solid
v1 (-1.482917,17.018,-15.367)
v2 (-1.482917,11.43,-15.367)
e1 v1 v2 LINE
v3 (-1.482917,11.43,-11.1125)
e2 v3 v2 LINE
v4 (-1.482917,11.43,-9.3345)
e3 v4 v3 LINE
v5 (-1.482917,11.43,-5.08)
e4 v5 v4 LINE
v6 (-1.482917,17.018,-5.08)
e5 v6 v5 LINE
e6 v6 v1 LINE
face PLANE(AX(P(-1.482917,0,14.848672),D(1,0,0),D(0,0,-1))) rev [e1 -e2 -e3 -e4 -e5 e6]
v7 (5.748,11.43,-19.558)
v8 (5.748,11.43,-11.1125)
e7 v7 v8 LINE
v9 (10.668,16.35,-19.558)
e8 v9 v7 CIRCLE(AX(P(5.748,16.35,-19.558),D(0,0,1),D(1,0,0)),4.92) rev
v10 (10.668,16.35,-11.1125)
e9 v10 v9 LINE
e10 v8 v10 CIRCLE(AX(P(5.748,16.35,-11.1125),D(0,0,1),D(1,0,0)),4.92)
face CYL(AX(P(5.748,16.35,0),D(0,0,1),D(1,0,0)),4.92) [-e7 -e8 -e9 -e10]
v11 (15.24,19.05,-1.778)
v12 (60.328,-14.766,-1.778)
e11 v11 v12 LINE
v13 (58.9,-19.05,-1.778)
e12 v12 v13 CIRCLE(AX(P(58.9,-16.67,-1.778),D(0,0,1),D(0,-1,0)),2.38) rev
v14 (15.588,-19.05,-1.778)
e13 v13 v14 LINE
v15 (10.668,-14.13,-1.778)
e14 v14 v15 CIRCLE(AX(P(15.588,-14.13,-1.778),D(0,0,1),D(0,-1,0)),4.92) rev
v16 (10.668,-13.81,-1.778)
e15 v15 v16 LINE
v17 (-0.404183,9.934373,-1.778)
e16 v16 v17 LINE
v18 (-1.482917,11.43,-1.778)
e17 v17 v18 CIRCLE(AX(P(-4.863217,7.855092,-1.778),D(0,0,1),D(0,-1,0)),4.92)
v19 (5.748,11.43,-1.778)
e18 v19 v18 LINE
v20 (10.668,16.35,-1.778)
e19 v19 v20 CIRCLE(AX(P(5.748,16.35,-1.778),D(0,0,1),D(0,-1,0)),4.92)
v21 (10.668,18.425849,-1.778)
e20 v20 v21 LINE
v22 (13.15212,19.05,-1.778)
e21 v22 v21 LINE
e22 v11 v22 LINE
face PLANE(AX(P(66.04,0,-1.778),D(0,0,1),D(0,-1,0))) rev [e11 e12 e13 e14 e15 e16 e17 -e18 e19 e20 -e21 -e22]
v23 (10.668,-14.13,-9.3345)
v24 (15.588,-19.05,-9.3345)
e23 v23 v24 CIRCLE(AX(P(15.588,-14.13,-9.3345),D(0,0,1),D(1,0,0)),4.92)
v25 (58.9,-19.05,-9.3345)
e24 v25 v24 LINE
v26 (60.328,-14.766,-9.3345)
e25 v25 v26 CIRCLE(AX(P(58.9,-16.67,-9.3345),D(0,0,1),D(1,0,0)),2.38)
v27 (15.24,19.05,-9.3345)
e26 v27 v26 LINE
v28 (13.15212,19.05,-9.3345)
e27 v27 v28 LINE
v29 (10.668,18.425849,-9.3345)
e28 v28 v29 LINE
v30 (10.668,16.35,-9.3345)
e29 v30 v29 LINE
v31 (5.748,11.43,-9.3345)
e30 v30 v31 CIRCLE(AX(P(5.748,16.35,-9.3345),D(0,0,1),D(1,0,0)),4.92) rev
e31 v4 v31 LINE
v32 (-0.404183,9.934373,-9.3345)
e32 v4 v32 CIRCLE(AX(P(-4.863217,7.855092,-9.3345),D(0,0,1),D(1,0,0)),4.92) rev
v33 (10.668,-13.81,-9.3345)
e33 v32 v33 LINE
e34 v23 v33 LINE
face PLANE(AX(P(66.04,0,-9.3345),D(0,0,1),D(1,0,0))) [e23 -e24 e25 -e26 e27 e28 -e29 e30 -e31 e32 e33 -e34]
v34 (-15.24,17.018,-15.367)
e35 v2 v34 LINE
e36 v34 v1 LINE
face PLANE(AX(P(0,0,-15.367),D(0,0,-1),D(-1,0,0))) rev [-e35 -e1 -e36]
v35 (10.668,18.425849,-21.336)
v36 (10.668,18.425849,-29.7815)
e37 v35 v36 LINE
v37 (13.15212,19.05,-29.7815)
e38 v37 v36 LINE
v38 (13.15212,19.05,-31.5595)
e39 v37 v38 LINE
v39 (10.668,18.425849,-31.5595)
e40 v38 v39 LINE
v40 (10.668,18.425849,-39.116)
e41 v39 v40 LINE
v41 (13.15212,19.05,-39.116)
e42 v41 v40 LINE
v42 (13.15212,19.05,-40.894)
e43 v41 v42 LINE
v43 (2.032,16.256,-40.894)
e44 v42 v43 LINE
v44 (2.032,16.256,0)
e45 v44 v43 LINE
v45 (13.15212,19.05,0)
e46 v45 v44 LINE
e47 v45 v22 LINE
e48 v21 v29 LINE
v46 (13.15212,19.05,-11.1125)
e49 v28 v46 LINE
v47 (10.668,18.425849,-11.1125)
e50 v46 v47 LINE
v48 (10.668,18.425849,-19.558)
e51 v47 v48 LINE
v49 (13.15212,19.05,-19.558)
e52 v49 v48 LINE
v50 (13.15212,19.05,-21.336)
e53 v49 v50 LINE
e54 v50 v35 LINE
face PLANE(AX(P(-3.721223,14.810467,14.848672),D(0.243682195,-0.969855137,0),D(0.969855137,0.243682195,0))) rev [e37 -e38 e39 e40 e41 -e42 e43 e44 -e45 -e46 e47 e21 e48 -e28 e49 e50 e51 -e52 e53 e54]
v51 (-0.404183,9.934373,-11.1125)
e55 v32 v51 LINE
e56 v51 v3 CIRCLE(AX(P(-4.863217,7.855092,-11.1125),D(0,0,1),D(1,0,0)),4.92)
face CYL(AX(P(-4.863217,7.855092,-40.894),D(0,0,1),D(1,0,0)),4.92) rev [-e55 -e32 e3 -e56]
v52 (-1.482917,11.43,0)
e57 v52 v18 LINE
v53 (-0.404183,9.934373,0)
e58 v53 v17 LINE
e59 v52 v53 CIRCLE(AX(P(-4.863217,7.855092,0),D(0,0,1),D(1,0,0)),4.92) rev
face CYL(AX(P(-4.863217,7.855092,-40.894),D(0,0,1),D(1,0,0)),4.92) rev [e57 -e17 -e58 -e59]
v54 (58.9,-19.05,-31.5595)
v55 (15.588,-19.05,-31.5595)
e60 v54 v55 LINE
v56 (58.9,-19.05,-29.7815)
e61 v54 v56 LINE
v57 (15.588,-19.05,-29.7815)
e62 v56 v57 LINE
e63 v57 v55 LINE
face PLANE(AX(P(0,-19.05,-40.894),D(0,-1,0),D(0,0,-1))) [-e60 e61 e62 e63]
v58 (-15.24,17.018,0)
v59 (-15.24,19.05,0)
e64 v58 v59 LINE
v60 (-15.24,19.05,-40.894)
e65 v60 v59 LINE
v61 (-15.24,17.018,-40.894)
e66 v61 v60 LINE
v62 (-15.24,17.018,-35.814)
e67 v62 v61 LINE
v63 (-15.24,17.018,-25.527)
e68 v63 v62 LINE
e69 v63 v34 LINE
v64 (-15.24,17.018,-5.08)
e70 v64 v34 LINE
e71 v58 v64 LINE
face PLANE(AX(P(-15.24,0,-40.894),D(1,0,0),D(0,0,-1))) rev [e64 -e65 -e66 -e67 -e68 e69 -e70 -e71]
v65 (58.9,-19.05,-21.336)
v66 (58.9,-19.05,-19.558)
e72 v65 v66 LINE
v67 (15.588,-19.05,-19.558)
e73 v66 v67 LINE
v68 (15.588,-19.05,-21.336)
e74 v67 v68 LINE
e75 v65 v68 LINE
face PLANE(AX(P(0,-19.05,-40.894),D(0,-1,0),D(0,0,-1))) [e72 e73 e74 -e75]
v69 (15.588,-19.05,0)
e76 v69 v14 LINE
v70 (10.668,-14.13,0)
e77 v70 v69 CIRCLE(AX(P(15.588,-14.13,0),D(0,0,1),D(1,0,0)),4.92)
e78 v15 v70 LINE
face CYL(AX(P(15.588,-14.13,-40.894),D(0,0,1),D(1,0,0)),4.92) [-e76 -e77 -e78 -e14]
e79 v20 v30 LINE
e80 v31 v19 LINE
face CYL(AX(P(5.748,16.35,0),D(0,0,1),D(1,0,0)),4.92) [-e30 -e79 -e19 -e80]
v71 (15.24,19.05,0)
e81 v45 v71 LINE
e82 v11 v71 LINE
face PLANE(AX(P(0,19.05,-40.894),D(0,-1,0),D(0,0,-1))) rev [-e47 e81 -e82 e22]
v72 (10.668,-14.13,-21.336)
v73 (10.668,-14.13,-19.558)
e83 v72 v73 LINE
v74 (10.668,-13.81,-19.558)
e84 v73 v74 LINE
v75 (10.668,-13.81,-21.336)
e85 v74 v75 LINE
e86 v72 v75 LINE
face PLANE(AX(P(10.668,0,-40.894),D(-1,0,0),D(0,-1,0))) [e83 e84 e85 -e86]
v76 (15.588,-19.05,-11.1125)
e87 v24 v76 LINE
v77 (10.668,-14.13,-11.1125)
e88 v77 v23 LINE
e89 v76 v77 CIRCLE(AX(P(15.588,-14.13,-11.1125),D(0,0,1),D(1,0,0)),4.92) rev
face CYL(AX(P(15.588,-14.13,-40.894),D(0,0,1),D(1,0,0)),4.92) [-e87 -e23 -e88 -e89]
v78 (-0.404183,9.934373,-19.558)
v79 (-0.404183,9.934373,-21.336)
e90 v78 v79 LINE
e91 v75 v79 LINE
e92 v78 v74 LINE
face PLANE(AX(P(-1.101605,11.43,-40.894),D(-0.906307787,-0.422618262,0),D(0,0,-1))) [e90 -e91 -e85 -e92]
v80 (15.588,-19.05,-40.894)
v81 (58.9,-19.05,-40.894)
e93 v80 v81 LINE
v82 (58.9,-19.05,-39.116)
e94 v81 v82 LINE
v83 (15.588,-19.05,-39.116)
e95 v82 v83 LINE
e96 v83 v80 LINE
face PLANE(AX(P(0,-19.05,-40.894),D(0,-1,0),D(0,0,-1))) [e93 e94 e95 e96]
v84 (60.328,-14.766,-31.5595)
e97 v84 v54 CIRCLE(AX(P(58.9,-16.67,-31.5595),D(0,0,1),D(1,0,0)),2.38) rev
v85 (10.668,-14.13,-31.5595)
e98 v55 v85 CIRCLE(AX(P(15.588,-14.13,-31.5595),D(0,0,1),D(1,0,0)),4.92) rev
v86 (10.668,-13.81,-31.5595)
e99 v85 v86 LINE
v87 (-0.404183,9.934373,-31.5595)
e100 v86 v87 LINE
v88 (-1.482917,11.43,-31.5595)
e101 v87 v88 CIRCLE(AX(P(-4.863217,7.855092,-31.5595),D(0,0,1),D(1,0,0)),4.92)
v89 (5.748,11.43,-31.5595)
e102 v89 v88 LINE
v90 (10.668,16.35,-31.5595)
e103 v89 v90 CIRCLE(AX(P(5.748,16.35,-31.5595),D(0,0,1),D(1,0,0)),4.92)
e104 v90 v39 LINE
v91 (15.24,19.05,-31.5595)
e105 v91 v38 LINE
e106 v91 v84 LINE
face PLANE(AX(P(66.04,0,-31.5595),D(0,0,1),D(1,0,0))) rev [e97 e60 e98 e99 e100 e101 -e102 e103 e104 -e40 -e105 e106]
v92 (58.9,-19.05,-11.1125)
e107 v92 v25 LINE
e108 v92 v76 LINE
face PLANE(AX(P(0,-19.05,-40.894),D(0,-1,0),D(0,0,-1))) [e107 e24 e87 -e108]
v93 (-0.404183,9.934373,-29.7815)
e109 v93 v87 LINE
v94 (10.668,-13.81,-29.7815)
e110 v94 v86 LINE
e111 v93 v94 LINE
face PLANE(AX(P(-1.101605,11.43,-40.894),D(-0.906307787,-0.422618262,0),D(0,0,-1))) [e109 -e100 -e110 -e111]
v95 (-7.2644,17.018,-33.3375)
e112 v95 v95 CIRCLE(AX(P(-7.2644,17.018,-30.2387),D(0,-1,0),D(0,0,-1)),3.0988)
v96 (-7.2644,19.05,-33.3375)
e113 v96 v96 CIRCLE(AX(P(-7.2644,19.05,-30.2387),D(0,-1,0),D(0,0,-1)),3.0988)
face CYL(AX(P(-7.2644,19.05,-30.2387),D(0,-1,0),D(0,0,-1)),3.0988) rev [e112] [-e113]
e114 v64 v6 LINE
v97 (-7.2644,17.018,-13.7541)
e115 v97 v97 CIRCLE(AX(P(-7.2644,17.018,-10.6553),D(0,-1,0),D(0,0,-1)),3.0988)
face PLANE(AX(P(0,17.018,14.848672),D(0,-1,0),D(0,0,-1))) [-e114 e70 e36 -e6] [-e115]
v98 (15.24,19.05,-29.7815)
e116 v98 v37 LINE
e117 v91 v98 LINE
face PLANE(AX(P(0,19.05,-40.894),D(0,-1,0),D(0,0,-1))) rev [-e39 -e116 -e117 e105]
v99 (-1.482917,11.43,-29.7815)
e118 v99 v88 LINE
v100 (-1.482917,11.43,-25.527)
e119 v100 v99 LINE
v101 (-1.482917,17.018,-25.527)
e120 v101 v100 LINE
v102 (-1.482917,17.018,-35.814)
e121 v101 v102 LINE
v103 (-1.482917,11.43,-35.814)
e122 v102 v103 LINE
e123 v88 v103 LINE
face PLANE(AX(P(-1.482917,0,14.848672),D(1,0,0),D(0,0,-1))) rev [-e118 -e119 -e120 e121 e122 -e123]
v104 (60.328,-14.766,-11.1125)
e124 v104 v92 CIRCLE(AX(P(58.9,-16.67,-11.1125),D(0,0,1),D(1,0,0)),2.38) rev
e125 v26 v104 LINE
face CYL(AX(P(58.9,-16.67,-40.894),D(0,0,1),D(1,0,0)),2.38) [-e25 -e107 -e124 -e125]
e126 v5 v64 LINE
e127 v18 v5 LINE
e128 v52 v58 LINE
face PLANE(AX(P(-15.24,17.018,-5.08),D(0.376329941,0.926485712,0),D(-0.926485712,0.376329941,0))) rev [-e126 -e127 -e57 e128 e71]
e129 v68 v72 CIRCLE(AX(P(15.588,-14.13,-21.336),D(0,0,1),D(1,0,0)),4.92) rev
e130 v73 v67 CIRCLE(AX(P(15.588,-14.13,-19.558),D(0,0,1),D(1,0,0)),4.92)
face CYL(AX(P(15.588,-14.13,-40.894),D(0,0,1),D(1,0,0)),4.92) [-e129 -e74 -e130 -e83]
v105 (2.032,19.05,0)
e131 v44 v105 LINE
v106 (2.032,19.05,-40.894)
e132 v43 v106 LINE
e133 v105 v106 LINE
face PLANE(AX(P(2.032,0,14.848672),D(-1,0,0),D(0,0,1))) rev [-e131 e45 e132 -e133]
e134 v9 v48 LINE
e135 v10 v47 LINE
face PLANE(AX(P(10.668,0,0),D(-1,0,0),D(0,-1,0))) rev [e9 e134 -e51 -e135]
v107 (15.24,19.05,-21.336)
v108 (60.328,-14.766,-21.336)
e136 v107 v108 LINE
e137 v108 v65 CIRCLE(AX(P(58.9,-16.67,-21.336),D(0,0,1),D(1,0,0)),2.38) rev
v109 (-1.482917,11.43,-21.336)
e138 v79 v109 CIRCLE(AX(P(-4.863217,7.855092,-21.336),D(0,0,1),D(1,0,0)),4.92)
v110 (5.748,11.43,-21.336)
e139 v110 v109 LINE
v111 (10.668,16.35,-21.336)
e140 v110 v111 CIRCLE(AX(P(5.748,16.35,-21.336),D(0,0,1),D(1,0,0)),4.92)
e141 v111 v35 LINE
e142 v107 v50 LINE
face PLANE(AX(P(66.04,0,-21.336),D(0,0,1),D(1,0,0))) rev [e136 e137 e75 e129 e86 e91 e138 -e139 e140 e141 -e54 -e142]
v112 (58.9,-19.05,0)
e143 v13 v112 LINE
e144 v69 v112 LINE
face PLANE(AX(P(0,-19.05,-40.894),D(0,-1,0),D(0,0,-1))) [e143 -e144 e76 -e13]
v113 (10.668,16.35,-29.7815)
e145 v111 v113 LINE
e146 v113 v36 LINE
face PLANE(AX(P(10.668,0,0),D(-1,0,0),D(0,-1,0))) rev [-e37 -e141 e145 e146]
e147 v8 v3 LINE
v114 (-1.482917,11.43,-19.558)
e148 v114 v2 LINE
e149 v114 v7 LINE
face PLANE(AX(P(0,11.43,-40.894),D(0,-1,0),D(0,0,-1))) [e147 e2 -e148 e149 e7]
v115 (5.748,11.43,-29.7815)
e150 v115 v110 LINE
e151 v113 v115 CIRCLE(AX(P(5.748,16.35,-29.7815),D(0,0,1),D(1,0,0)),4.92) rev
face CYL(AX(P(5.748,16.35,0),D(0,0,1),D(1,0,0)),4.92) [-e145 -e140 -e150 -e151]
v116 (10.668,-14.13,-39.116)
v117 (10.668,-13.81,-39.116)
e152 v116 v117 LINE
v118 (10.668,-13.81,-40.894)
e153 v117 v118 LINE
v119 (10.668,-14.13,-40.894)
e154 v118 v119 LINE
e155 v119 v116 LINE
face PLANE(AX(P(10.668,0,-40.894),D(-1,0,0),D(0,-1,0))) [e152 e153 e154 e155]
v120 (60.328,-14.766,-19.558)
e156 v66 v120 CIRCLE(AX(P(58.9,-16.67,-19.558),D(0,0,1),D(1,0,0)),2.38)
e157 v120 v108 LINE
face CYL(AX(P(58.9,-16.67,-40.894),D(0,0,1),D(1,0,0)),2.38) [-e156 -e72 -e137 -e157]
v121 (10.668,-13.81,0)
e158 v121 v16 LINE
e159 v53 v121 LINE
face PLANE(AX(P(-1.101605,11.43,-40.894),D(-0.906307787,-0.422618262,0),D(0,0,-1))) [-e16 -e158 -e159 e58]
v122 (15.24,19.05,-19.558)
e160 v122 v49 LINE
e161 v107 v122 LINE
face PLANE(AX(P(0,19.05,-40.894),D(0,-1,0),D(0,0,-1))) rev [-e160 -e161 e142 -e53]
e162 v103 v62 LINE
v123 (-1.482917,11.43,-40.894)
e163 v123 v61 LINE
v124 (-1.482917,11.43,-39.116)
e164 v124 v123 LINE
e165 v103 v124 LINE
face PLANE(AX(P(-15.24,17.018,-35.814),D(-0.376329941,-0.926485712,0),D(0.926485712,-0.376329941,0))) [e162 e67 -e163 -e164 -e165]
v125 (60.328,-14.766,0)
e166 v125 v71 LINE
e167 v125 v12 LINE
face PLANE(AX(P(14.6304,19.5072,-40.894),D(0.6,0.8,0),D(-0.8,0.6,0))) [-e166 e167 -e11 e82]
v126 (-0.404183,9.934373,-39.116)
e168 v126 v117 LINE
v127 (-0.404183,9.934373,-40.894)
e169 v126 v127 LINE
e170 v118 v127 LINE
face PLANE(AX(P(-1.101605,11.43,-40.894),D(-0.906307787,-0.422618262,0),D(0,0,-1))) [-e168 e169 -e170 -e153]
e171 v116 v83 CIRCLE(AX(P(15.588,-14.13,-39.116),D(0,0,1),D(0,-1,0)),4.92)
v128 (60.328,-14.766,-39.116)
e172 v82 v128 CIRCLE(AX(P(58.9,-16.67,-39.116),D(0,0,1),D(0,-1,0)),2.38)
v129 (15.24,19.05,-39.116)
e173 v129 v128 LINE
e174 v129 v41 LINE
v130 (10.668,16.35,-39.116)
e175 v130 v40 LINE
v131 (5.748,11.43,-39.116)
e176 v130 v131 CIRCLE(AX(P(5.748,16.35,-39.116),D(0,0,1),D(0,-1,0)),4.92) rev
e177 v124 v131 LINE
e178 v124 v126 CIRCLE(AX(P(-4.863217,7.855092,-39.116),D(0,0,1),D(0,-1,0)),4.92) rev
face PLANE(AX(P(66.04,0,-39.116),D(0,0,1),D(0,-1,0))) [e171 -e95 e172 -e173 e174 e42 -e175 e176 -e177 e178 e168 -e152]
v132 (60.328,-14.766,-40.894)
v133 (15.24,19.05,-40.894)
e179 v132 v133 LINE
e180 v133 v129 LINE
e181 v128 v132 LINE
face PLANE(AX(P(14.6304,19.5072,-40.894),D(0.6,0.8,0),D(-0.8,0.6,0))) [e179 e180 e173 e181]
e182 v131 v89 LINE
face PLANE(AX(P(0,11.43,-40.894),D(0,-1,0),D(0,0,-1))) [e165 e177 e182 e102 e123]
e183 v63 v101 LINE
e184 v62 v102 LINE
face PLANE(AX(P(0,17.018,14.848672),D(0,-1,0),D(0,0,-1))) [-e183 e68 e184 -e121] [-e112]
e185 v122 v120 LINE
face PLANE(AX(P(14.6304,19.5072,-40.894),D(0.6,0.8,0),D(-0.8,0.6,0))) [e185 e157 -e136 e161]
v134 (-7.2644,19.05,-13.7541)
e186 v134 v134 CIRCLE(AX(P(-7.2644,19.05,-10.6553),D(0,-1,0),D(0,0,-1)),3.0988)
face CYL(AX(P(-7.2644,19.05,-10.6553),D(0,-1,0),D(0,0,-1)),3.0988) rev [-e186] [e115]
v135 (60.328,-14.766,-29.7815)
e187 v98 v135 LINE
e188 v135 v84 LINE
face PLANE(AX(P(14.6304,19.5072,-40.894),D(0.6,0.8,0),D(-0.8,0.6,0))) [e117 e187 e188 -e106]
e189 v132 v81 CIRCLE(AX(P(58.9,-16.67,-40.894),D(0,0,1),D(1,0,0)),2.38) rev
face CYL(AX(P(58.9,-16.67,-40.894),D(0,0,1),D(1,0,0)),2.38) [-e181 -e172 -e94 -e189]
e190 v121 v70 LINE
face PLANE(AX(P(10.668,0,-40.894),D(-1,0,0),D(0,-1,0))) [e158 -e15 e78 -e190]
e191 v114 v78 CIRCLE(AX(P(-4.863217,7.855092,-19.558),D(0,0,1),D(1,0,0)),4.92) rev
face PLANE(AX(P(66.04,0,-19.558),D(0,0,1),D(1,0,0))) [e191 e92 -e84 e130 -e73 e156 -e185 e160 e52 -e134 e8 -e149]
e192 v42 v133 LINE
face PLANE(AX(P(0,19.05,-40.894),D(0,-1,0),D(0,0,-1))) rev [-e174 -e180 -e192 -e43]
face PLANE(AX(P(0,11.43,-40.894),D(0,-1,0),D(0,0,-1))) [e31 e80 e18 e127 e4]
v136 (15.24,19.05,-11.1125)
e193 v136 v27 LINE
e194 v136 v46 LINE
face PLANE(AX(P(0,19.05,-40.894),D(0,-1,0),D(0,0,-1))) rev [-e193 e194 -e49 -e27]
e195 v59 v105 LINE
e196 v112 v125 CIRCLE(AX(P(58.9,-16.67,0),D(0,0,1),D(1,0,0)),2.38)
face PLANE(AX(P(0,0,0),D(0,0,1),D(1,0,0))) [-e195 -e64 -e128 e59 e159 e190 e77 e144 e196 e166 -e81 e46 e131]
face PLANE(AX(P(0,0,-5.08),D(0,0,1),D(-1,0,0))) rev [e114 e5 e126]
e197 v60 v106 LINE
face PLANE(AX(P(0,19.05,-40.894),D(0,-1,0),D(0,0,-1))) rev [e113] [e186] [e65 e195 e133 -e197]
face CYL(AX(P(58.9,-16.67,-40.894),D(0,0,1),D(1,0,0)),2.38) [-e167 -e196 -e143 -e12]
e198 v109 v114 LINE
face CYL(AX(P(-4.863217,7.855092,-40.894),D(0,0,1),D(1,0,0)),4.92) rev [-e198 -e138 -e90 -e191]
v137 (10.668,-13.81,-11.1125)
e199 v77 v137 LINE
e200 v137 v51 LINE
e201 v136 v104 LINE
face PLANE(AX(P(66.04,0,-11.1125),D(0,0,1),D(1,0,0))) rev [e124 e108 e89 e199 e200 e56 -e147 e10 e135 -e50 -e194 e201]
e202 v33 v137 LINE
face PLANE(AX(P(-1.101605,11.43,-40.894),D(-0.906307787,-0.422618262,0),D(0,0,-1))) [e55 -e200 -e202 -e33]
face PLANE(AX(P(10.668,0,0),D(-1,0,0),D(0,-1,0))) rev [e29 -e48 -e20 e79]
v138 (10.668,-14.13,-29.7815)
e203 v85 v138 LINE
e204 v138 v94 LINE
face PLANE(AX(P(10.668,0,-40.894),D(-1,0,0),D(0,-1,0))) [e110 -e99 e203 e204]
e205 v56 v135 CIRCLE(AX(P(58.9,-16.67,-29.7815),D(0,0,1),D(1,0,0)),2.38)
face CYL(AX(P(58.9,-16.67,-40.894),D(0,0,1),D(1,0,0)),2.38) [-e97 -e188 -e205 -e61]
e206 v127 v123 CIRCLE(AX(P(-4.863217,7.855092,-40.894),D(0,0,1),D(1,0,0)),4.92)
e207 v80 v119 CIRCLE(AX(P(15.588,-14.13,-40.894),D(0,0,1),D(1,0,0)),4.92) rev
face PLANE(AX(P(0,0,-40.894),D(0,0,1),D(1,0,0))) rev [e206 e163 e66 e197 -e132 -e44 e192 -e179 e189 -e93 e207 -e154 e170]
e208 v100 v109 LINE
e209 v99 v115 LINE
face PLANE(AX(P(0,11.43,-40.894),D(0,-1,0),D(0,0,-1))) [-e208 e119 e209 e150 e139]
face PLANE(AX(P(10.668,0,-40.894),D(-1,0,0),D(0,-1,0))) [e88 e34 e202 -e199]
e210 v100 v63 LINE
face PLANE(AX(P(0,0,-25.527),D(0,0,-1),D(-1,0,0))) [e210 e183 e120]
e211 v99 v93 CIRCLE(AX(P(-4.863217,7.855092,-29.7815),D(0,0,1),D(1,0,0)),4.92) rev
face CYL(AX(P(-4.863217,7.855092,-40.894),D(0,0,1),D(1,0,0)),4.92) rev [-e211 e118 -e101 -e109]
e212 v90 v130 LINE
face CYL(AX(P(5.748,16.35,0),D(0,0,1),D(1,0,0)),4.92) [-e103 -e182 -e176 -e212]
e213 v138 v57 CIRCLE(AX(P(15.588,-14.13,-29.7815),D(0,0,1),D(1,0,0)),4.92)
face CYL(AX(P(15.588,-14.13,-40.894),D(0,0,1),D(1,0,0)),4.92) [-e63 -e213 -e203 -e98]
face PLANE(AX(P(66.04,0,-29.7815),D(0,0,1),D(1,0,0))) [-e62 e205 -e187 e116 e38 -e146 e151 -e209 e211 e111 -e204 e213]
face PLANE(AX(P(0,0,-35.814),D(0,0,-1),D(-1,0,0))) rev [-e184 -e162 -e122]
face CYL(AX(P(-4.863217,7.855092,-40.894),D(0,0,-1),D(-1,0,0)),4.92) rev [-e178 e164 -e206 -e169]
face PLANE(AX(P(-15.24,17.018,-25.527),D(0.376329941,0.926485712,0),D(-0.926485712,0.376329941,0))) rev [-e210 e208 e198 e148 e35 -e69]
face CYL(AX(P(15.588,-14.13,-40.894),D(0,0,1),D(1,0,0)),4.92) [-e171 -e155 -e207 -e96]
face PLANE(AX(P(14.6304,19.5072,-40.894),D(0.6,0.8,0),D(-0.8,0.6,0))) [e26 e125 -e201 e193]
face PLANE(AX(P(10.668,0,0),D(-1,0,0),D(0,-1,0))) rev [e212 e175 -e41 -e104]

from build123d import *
from OCP.BRepFilletAPI import BRepFilletAPI_MakeChamfer

# Parameters (mm, degrees)
BOSS_EXTRUDE1_DEPTH = 40.894
SKETCH3_W           = 13.757082797
SKETCH3_H           = 5.588
CUT_EXTRUDE2_DEPTH  = 40.894
SKETCH6_W           = 7.5565
SKETCH6_H           = 30.48
SKETCH6_H_2         = 7.62
SKETCH6_W_2         = 8.4455
CUT_EXTRUDE4_DEPTH  = 72.423246356
FILLET1_R           = 2.38
FILLET2_R           = 4.92
CHAMFER1_SIZE       = 25.24
CHAMFER1_SIZE2      = 11.769605292
SKETCH9_R           = 3.0988
CUT_EXTRUDE5_DEPTH  = 83.027180008
BOSS_EXTRUDE3_DEPTH = 5.08
BOSS_EXTRUDE4_DEPTH = 5.08
FILLET3_R           = 4.92
FILLET4_R           = 4.92


with BuildPart() as part:
    # Sketch1 → Boss-Extrude1 (new body)
    with BuildSketch(Plane.XY):
        Polygon((66.04, -19.05), (15.24, 19.05), (-15.24, 19.05), (-15.24, 11.43), (10.668, 11.43), (10.668, -19.05), align=None)
    extrude(amount=-BOSS_EXTRUDE1_DEPTH)

    # Sketch3 → Cut-Extrude2 (cut)
    with BuildSketch(Plane(origin=(0, 0, -40.894), x_dir=(-1, 0, 0), z_dir=(0, 0, -1))):
        with Locations((8.361458602, 14.224)):
            Rectangle(SKETCH3_W, SKETCH3_H)
        Polygon((-2.032, 16.256), (-2.032, 19.05), (-13.15212, 19.05), align=None)
    extrude(amount=-CUT_EXTRUDE2_DEPTH, mode=Mode.SUBTRACT)

    # Sketch6 → Cut-Extrude4 (cut, through all)
    with BuildSketch(Plane.ZY.offset(-10.668)):
        with Locations((-35.33775, -3.81)):
            Rectangle(SKETCH6_W, SKETCH6_H)
        with Locations((-35.33775, 15.24)):
            Rectangle(SKETCH6_W, SKETCH6_H_2)
        with Locations((-25.55875, 15.24)):
            Rectangle(SKETCH6_W_2, SKETCH6_H_2)
        with Locations((-25.55875, -3.81)):
            Rectangle(SKETCH6_W_2, SKETCH6_H)
        with Locations((-15.33525, -3.81)):
            Rectangle(SKETCH6_W_2, SKETCH6_H)
        with Locations((-15.33525, 15.24)):
            Rectangle(SKETCH6_W_2, SKETCH6_H_2)
        with Locations((-5.55625, 15.24)):
            Rectangle(SKETCH6_W, SKETCH6_H_2)
        with Locations((-5.55625, -3.81)):
            Rectangle(SKETCH6_W, SKETCH6_H)
    extrude(amount=-CUT_EXTRUDE4_DEPTH, mode=Mode.SUBTRACT)

    # Fillet1
    fillet1_edges = [part.edges().sort_by_distance(p)[0] for p in [
        (66.04, -19.05, -40.005),
        (66.04, -19.05, -30.6705),
        (66.04, -19.05, -20.447),
        (66.04, -19.05, -10.2235),
        (66.04, -19.05, -0.889),
    ]]
    fillet(fillet1_edges, radius=FILLET1_R)

    # Fillet2
    fillet2_edges = [part.edges().sort_by_distance(p)[0] for p in [
        (10.668, -19.05, -40.005),
        (10.668, -19.05, -30.6705),
        (10.668, -19.05, -20.447),
        (10.668, -19.05, -10.2235),
        (10.668, -19.05, -0.889),
    ]]
    fillet(fillet2_edges, radius=FILLET2_R)

    # Chamfer1: one chamfer whose edges measure the first distance from different faces: ONE call of the kernel's chamfer builder (chamfer() names one face for all edges)
    chamfer1_edges_1 = [part.edges().sort_by_distance(p)[0] for p in [
        (10.668, 11.43, -40.005),
    ]]
    chamfer1_side_1 = [part.faces().sort_by_distance(p)[0] for p in [
        (10.668, -1.35, -40.005),
    ]]
    chamfer1_edges_2 = [part.edges().sort_by_distance(p)[0] for p in [
        (10.668, 11.43, -30.6705),
    ]]
    chamfer1_side_2 = [part.faces().sort_by_distance(p)[0] for p in [
        (10.668, -1.35, -30.6705),
    ]]
    chamfer1_edges_3 = [part.edges().sort_by_distance(p)[0] for p in [
        (10.668, 11.43, -20.447),
    ]]
    chamfer1_side_3 = [part.faces().sort_by_distance(p)[0] for p in [
        (10.668, -1.35, -20.447),
    ]]
    chamfer1_edges_4 = [part.edges().sort_by_distance(p)[0] for p in [
        (10.668, 11.43, -10.2235),
    ]]
    chamfer1_side_4 = [part.faces().sort_by_distance(p)[0] for p in [
        (10.668, -1.35, -10.2235),
    ]]
    chamfer1_edges_5 = [part.edges().sort_by_distance(p)[0] for p in [
        (10.668, 11.43, -0.889),
    ]]
    chamfer1_side_5 = [part.faces().sort_by_distance(p)[0] for p in [
        (10.668, -1.35, -0.889),
    ]]
    chamfer1 = BRepFilletAPI_MakeChamfer(part.part.solid().wrapped)
    for e in chamfer1_edges_1:
        chamfer1.Add(CHAMFER1_SIZE, CHAMFER1_SIZE2, e.wrapped, chamfer1_side_1[0].wrapped)  # the first distance lies on this face
    for e in chamfer1_edges_2:
        chamfer1.Add(CHAMFER1_SIZE, CHAMFER1_SIZE2, e.wrapped, chamfer1_side_2[0].wrapped)  # the first distance lies on this face
    for e in chamfer1_edges_3:
        chamfer1.Add(CHAMFER1_SIZE, CHAMFER1_SIZE2, e.wrapped, chamfer1_side_3[0].wrapped)  # the first distance lies on this face
    for e in chamfer1_edges_4:
        chamfer1.Add(CHAMFER1_SIZE, CHAMFER1_SIZE2, e.wrapped, chamfer1_side_4[0].wrapped)  # the first distance lies on this face
    for e in chamfer1_edges_5:
        chamfer1.Add(CHAMFER1_SIZE, CHAMFER1_SIZE2, e.wrapped, chamfer1_side_5[0].wrapped)  # the first distance lies on this face
    add(Compound.cast(chamfer1.Shape()), mode=Mode.REPLACE)

    # Sketch9 → Cut-Extrude5 (cut, through all)
    with BuildSketch(Plane.XZ.offset(-17.018)):
        with Locations(Location((-7.2644, -10.6553, 0), (0, 0, 270))):
            Circle(SKETCH9_R)
        with Locations(Location((-7.2644, -30.2387, 0), (0, 0, 270))):
            Circle(SKETCH9_R)
    extrude(amount=-CUT_EXTRUDE5_DEPTH, mode=Mode.SUBTRACT)

    # Sketch10 → Boss-Extrude3 (add, symmetric)
    with BuildSketch(Plane(origin=(0, 0, -20.447), x_dir=(-1, 0, 0), z_dir=(0, 0, -1))):
        Polygon((1.482917203, 17.018), (15.24, 17.018), (1.482917203, 11.43), align=None)
    extrude(amount=BOSS_EXTRUDE3_DEPTH, both=True)

    # Sketch11 → Boss-Extrude4 (add)
    with BuildSketch(Plane(origin=(0, 0, -40.894), x_dir=(-1, 0, 0), z_dir=(0, 0, -1))):
        Polygon((1.482917203, 17.018), (15.24, 17.018), (1.482917203, 11.43), align=None)
    boss_extrude4 = extrude(amount=-BOSS_EXTRUDE4_DEPTH)

    # Mirror1: Boss-Extrude4 across plane
    add(boss_extrude4.mirror(Plane(origin=(0, 0, -20.447), x_dir=(1, 0, 0), z_dir=(0, 0, -1))))

    # Fillet3
    fillet3_edges = [part.edges().sort_by_distance(p)[0] for p in [
        (10.668, 11.43, -25.55875),
        (10.668, 11.43, -15.33525),
        (10.668, 11.43, -5.55625),
        (10.668, 11.43, -35.33775),
    ]]
    fillet(fillet3_edges, radius=FILLET3_R)

    # Fillet4
    # the kernel refuses this fillet: 4.92 mm, written as the material it adds along each edge
    with BuildSketch(Plane(origin=(-1.101605292, 11.43, 0), x_dir=(-1, 0, 0), z_dir=(0, 0, -1)), Plane(origin=(-1.101605292, 11.43, -39.116), x_dir=(-1, 0, 0), z_dir=(0, 0, -1)), Plane(origin=(-1.101605292, 11.43, -29.7815), x_dir=(-1, 0, 0), z_dir=(0, 0, -1)), Plane(origin=(-1.101605292, 11.43, -19.558), x_dir=(-1, 0, 0), z_dir=(0, 0, -1)), Plane(origin=(-1.101605292, 11.43, -9.3345), x_dir=(-1, 0, 0), z_dir=(0, 0, -1))) as fillet4_piece_1:
        with BuildLine():
            CenterArc((3.761612208, -3.574908377), FILLET4_R, 133.397271211, 21.602728789)
            Line((-0.697422104, -1.495626529), (-0.78660279, -1.454040892))
            Line((-0.78660279, -1.454040892), (-0.089180686, 0.041585637))
            Line((-0.089180686, 0.041585637), (0, 0.0984))
            ThreePointArc((0, 0.0984), (0.190655955, 0.0984), (0.313705905, 0.071498168))
            Line((0.313705905, 0.071498168), (0.381311911, 0))
        make_face()
    extrude(amount=1.778)


solid = part.part
